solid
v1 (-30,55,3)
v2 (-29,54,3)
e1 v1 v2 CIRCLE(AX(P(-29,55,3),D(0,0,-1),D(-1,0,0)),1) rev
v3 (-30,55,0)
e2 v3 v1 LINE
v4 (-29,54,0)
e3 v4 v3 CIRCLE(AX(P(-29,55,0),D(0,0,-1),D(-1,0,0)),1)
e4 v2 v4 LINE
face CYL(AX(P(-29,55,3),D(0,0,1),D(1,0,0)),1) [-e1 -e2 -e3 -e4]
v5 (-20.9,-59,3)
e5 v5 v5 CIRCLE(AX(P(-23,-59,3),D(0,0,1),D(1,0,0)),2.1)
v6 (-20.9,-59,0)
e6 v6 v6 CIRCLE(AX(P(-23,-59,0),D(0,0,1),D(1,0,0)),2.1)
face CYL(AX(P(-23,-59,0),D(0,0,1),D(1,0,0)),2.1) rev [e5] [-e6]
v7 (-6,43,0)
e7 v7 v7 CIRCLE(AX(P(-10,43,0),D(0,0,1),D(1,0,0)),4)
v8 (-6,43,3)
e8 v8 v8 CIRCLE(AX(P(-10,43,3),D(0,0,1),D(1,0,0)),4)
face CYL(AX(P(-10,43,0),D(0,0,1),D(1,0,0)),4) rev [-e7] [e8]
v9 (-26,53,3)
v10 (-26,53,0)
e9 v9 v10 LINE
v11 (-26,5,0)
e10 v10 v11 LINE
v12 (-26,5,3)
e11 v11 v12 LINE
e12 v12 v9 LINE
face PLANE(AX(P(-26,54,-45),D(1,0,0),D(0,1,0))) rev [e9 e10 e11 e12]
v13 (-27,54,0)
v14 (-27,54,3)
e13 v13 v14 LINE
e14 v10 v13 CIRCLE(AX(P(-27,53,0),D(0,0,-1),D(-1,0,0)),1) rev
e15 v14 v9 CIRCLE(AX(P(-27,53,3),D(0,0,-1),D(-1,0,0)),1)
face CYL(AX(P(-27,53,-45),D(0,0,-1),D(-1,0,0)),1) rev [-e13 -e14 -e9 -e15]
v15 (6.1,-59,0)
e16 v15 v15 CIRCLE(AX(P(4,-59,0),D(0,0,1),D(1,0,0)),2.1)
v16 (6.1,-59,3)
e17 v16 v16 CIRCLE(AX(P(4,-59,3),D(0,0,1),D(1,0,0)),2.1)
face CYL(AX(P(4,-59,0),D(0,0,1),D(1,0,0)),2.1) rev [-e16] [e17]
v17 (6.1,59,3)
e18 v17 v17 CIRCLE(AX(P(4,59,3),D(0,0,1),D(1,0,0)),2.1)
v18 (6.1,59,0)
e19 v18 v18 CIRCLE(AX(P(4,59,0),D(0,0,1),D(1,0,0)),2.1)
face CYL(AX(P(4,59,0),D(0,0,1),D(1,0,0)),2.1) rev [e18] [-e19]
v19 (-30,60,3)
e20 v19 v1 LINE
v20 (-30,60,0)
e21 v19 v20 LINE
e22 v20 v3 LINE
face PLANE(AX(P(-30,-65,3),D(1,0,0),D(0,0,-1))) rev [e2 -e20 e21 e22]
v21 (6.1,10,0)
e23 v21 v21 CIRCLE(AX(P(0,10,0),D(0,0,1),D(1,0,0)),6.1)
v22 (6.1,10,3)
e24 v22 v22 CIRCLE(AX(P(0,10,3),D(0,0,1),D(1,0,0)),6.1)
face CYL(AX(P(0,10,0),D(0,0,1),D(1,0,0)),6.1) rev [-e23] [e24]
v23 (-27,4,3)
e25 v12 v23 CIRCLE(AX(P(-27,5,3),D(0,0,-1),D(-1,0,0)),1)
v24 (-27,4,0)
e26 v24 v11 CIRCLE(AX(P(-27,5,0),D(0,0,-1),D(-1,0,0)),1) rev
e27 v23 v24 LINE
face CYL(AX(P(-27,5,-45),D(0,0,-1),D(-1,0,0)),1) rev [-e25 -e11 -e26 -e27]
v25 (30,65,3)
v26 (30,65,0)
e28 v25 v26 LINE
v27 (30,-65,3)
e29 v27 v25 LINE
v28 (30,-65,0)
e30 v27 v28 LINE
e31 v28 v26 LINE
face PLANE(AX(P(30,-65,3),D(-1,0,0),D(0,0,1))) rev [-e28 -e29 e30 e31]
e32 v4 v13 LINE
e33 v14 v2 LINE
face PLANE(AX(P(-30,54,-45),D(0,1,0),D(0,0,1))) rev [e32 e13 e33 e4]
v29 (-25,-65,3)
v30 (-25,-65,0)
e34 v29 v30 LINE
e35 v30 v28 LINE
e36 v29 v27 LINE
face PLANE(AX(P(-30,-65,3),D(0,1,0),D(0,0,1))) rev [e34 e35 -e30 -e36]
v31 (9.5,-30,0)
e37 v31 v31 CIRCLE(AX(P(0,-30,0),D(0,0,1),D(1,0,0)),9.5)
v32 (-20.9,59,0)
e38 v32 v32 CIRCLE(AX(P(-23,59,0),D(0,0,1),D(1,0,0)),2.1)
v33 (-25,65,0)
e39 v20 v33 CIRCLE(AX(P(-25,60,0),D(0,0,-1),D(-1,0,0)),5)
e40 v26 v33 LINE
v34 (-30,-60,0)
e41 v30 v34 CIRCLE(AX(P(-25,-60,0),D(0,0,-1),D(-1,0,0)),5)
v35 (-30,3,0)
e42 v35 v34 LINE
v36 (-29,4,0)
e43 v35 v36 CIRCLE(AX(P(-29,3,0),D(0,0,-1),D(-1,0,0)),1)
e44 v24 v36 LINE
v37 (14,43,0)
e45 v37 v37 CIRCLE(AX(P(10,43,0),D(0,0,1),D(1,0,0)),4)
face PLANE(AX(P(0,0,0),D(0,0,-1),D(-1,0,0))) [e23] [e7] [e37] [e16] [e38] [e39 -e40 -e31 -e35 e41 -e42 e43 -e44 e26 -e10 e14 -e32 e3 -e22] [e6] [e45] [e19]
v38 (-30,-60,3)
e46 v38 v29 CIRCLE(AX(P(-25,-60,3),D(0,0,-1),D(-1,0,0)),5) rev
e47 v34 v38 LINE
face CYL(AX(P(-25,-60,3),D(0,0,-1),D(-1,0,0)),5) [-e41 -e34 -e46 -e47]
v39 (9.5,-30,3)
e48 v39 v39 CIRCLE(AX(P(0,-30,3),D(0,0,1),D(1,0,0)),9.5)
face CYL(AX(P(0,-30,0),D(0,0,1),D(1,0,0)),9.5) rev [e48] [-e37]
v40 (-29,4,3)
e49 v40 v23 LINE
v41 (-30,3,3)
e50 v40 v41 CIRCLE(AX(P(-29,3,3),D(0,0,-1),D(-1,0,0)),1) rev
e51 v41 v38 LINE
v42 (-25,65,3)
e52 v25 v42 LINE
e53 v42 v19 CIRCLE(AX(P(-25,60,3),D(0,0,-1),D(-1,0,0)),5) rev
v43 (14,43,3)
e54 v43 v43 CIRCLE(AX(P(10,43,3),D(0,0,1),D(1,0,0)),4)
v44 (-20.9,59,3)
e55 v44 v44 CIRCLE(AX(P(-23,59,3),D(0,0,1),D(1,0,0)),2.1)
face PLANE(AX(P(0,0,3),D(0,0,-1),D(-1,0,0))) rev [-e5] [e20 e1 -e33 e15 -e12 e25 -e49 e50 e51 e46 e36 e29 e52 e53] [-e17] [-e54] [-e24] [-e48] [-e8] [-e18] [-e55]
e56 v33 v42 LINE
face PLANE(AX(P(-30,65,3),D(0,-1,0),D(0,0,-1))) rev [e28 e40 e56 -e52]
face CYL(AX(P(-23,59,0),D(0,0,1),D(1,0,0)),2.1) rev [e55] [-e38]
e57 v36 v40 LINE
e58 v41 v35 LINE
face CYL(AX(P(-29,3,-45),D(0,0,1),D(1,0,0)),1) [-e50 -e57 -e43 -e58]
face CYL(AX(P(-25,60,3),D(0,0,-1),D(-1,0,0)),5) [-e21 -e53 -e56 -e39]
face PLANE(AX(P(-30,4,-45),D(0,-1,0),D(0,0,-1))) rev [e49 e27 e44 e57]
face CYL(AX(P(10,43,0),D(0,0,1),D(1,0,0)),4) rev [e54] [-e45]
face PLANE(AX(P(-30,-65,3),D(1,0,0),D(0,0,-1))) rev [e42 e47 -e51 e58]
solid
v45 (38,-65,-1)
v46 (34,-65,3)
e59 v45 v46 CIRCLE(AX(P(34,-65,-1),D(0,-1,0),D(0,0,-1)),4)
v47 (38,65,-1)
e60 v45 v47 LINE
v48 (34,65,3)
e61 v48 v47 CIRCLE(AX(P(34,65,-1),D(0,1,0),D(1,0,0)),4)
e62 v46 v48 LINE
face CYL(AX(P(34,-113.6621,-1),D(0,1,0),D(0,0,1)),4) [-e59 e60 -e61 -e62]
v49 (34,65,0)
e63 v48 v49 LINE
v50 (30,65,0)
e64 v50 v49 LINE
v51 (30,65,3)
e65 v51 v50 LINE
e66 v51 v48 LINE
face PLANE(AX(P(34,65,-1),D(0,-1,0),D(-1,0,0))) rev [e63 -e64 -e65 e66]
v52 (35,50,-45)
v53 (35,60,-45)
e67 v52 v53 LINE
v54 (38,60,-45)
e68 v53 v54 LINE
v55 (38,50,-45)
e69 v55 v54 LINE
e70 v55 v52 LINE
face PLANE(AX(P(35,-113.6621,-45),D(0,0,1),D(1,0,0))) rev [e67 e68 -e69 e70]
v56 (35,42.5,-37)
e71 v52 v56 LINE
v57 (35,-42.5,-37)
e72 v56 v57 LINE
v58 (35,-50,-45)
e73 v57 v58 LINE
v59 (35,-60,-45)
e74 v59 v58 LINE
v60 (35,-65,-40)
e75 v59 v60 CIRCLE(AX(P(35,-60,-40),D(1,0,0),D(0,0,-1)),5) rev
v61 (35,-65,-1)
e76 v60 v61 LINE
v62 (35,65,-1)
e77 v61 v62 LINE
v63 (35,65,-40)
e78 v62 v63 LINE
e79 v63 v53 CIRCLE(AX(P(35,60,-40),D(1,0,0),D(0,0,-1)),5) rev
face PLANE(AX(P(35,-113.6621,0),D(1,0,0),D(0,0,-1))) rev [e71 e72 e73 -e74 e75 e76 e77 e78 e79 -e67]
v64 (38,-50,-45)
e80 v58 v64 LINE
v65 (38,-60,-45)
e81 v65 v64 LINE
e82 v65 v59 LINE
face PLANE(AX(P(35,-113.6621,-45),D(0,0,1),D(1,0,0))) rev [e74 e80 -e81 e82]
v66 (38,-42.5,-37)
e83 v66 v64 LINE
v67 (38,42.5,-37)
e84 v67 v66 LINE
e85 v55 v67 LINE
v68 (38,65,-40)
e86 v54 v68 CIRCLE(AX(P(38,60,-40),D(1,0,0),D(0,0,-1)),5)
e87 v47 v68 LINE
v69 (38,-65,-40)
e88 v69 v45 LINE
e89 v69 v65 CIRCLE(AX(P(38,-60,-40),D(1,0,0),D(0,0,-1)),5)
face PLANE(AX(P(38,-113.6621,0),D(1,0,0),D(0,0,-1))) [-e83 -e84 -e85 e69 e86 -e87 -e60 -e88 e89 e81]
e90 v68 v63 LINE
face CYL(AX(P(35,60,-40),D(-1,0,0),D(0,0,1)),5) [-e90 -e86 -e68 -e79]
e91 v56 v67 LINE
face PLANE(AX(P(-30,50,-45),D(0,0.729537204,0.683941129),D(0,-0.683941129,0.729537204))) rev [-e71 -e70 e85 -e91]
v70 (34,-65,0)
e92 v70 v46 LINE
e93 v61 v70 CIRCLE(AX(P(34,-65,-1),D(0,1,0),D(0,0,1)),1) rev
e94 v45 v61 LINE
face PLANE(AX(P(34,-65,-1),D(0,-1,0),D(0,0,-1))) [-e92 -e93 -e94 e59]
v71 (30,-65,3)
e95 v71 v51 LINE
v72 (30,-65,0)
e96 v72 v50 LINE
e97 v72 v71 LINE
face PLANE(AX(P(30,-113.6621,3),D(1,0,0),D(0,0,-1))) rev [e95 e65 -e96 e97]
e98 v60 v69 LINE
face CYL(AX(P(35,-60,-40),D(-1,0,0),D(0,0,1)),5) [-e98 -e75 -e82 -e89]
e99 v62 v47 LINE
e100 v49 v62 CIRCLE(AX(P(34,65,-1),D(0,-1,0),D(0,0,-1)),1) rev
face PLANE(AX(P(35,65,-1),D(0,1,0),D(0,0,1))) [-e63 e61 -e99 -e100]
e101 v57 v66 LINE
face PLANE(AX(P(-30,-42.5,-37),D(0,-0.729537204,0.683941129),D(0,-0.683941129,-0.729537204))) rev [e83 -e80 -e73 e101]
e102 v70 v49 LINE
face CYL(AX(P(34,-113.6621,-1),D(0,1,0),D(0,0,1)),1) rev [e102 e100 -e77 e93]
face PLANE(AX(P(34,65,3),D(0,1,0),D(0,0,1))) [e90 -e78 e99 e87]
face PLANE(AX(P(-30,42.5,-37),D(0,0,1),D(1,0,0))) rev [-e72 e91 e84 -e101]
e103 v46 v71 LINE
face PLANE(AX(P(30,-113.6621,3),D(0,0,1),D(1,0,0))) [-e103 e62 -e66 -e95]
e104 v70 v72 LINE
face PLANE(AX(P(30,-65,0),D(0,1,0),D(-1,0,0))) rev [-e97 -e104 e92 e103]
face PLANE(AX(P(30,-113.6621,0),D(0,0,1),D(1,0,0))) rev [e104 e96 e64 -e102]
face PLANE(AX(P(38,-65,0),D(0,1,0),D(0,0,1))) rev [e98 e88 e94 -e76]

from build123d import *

# Parameters (mm, degrees)
SKETCH1_W              = 60
SKETCH1_H              = 130
BOSS_EXTRUDE1_DEPTH    = 3
SKETCH2_R              = 2.1
CUT_EXTRUDE1_DEPTH     = 72.651936471
LPATTERN1_COUNT        = 2
LPATTERN1_PITCH        = 27
LPATTERN1_COUNT_DIR2   = 2
LPATTERN1_PITCH_DIR2   = 118
SKETCH3_R              = 9.5
CUT_EXTRUDE2_DEPTH     = 72.651936471
SKETCH_1_R             = 6.1
CUT_EXTRUDE_1_DEPTH    = 72.651936471
SKETCH_2_R             = 4
CUT_EXTRUDE_2_DEPTH    = 72.651936471
FILLET_1_R             = 5
SM_BASE_FLANGE_1_DEPTH = 130
FILLET_2_R             = 5
CUT_EXTRUDE_3_DEPTH    = 105.27847333
SKETCH_9_W             = 4
SKETCH_9_H             = 50
CUT_EXTRUDE_4_DEPTH    = 90.291656945
FILLET_3_R             = 1


# Sheet-metal steps are written as plain solids
with BuildPart() as part:
    # Sketch1 → Boss-Extrude1 (new body)
    with BuildSketch(Plane.XY):
        Rectangle(SKETCH1_W, SKETCH1_H)
    extrude(amount=BOSS_EXTRUDE1_DEPTH)

    # Sketch2 → Cut-Extrude1 (cut, through all)
    with BuildSketch(Plane.XY.offset(3)):
        with Locations((-23, 59)):
            Circle(SKETCH2_R)
    cut_extrude1 = extrude(amount=-CUT_EXTRUDE1_DEPTH, mode=Mode.SUBTRACT)

    # LPattern1: Cut-Extrude1 2 × 2
    with Locations(*[(i * LPATTERN1_PITCH, -j * LPATTERN1_PITCH_DIR2, 0) for i in range(LPATTERN1_COUNT) for j in range(LPATTERN1_COUNT_DIR2) if (i, j) != (0, 0)]):
        add(cut_extrude1, mode=Mode.SUBTRACT)

    # Sketch3 → Cut-Extrude2 (cut, through all)
    with BuildSketch(Plane.XY.offset(3)):
        with Locations((0, -30)):
            Circle(SKETCH3_R)
    extrude(amount=-CUT_EXTRUDE2_DEPTH, mode=Mode.SUBTRACT)

    # 草圖1 → 除料-伸長1 (cut, through all)
    with BuildSketch(Plane.XY.offset(3)):
        with Locations((0, 10)):
            Circle(SKETCH_1_R)
    extrude(amount=-CUT_EXTRUDE_1_DEPTH, mode=Mode.SUBTRACT)

    # 草圖2 → 除料-伸長2 (cut, through all)
    with BuildSketch(Plane.XY.offset(3)):
        with Locations((-10, 43)):
            Circle(SKETCH_2_R)
        with Locations((10, 43)):
            Circle(SKETCH_2_R)
    extrude(amount=-CUT_EXTRUDE_2_DEPTH, mode=Mode.SUBTRACT)

    # 圓角1
    fillet_1_edges = [part.edges().sort_by_distance(p)[0] for p in [
        (-30, -65, 1.5),
        (-30, 65, 1.5),
    ]]
    fillet(fillet_1_edges, radius=FILLET_1_R)

    # 草圖9 → 除料-伸長4 (cut, through all)
    with BuildSketch(Plane.XY.offset(3)):
        with Locations((-28, 29)):
            Rectangle(SKETCH_9_W, SKETCH_9_H)
    extrude(amount=-CUT_EXTRUDE_4_DEPTH, mode=Mode.SUBTRACT)

    # 圓角3
    fillet_3_edges = [part.edges().sort_by_distance(p)[0] for p in [
        (-30, 4, 1.5),
        (-30, 54, 1.5),
        (-26, 54, 1.5),
        (-26, 4, 1.5),
    ]]
    fillet(fillet_3_edges, radius=FILLET_3_R)


with BuildPart() as body_2:
    # 草圖3 → 基材-凸緣1 (new body)
    with BuildSketch(Plane(origin=(30, 65, 0), x_dir=(1, 0, 0), z_dir=(0, 1, 0))):
        with BuildLine():
            Line((0, 0), (4, 0))
            ThreePointArc((4, 0), (4.707106781, 0.292893219), (5, 1))
            Line((5, 1), (5, 45))
            Line((5, 45), (8, 45))
            Line((8, 45), (8, 1))
            ThreePointArc((8, 1), (6.828427125, -1.828427125), (4, -3))
            Line((4, -3), (0, -3))
            Line((0, -3), (0, 0))
        make_face()
    extrude(amount=-SM_BASE_FLANGE_1_DEPTH)

    # 圓角2
    fillet_2_edges = [body_2.edges().sort_by_distance(p)[0] for p in [
        (36.5, -65, -45),
        (36.5, 65, -45),
    ]]
    fillet(fillet_2_edges, radius=FILLET_2_R)

    # 草圖8 → 除料-伸長3 (cut, through all)
    with BuildSketch(Plane(origin=(38, 0, 0), x_dir=(0, 0, -1), z_dir=(1, 0, 0))):
        Polygon((45, 50), (37, 42.5), (37, -42.5), (45, -50), align=None)
    extrude(amount=-CUT_EXTRUDE_3_DEPTH, mode=Mode.SUBTRACT)


solid = Compound([part.part, body_2.part])
